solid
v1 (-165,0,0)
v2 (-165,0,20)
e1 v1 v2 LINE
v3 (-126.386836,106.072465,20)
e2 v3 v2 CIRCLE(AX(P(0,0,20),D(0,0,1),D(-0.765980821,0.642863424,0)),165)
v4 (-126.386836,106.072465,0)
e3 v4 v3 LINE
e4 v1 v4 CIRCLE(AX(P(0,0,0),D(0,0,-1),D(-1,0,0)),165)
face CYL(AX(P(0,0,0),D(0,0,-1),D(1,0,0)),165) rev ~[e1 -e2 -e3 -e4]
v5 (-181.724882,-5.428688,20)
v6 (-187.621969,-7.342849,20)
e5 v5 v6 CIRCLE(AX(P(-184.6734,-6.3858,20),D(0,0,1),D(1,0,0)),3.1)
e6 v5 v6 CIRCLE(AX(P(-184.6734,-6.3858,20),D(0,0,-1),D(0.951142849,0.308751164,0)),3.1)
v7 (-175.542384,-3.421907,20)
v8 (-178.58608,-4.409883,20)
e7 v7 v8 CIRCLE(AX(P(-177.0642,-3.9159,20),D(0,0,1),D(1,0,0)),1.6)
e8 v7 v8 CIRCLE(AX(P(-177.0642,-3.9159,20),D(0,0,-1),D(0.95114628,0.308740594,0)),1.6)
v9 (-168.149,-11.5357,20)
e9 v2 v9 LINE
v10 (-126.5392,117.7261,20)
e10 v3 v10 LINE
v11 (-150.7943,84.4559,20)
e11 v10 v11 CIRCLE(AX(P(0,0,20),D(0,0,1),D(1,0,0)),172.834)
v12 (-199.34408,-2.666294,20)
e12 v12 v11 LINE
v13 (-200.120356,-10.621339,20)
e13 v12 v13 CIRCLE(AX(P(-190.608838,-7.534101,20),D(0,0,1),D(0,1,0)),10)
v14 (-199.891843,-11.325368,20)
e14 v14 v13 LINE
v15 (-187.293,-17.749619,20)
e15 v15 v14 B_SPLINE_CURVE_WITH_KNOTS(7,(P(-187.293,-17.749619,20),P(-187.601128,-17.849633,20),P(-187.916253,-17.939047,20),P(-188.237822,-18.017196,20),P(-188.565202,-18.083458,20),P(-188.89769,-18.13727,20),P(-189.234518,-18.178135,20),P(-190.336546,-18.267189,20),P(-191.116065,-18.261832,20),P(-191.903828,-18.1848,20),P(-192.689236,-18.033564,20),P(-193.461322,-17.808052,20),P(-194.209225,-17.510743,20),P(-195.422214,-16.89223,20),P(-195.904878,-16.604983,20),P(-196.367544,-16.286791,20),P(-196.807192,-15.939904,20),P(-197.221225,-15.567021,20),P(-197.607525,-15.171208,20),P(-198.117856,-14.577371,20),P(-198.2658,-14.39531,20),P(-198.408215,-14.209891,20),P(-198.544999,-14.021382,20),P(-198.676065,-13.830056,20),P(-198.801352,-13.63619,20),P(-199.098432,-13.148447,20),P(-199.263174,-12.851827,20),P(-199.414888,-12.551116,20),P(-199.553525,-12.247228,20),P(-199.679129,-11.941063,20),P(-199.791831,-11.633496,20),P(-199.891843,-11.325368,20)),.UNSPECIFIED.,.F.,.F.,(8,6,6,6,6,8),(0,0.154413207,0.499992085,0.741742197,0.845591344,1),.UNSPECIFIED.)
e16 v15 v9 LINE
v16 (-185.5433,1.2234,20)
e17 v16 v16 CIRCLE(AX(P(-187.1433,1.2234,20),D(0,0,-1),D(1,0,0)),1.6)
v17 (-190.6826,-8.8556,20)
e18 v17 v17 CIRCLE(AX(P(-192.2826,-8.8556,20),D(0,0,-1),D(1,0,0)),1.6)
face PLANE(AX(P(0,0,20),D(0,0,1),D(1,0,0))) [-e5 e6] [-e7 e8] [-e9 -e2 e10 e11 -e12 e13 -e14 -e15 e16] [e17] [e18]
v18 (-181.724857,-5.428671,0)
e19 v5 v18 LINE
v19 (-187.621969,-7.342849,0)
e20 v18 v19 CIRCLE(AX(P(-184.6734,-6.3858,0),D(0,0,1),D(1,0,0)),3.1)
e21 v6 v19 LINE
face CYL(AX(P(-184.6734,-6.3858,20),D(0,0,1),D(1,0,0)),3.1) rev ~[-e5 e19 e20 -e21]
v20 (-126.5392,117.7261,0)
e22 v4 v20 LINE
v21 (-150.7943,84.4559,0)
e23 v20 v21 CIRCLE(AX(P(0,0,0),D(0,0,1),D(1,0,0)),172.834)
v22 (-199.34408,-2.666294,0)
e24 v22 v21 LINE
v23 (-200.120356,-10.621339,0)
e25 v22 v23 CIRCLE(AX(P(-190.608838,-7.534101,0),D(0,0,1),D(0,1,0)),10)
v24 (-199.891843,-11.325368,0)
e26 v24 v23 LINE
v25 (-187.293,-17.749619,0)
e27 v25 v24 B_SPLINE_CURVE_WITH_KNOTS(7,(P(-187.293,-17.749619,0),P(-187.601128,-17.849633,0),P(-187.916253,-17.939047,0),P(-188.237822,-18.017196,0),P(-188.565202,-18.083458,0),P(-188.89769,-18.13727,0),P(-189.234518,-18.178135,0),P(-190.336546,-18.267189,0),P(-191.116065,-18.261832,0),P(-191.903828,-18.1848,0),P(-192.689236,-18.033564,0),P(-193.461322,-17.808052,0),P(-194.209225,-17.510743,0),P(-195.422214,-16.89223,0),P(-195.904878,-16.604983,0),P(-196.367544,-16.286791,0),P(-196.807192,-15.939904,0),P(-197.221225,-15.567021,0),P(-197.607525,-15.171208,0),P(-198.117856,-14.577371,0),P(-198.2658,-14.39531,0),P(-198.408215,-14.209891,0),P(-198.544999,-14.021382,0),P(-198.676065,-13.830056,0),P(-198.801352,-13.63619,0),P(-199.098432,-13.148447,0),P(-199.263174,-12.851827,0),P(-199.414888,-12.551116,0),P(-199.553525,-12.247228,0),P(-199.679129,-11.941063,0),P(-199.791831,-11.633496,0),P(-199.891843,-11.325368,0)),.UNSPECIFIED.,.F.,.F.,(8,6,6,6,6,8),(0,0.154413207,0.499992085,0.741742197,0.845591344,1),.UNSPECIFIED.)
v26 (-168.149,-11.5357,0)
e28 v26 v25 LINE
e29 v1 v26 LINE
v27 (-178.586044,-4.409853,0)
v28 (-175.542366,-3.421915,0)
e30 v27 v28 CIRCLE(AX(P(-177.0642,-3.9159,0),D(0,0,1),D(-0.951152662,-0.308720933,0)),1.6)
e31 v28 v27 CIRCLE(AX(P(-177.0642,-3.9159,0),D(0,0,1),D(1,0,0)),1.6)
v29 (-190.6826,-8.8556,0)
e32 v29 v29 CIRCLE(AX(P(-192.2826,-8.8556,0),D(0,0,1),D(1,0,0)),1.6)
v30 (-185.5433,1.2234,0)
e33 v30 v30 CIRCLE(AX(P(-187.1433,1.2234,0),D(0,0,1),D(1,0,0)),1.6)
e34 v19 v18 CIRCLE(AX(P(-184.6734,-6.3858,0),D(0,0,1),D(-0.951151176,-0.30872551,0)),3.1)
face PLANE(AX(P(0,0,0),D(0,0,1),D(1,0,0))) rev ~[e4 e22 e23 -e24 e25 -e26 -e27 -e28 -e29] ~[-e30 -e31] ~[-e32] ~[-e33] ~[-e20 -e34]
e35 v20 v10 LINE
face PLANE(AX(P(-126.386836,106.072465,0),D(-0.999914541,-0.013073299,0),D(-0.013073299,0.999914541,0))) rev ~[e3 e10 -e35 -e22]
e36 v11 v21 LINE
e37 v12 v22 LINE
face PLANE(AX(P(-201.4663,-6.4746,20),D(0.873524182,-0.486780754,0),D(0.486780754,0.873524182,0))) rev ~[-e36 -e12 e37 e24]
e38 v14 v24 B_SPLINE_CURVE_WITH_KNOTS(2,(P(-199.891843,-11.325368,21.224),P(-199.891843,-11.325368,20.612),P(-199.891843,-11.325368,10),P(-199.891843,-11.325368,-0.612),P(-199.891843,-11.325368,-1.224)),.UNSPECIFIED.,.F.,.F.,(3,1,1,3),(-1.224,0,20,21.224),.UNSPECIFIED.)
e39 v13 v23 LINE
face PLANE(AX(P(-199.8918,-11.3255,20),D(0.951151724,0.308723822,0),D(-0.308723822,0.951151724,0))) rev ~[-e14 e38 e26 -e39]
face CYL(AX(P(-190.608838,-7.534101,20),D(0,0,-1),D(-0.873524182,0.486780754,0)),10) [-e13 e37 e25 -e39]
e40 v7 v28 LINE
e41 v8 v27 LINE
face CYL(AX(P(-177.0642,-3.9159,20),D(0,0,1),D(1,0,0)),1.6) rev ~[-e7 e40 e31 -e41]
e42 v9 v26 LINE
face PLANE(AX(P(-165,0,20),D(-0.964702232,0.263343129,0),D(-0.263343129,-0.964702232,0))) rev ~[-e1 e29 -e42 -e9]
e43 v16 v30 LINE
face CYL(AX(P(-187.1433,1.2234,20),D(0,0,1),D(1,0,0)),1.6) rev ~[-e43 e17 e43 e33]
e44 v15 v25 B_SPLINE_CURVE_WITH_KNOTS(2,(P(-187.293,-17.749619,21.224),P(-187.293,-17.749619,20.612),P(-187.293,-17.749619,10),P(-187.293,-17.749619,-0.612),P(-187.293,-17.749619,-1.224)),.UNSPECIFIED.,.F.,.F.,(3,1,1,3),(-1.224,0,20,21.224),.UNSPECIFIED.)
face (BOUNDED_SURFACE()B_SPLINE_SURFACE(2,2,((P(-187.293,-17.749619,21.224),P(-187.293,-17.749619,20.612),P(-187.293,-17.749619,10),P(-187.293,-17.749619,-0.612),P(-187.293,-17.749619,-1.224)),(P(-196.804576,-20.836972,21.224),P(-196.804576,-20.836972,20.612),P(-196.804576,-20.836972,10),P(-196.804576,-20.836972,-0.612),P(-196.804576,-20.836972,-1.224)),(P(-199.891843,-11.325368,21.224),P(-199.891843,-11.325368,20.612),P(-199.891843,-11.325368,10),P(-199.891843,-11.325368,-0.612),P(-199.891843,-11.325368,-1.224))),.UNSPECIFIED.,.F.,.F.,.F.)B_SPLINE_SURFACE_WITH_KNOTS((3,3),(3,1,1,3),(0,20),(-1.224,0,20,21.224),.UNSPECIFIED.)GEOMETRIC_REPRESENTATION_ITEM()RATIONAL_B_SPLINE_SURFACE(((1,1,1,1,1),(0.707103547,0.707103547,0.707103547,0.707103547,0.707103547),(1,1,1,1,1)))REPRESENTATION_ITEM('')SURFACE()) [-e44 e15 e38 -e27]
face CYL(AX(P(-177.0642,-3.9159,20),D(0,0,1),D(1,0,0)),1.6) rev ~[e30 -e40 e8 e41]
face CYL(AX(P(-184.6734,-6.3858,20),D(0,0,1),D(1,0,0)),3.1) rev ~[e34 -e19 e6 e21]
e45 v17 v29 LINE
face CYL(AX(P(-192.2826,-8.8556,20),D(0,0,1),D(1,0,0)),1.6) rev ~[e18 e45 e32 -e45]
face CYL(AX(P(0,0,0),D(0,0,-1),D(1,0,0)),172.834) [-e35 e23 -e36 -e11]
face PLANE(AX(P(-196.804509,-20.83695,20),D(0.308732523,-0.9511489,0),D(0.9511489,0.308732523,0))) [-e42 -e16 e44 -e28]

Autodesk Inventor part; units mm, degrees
ref_plane "YZ Plane" through (0, 0, 0) normal (1, 0, 0) x (0, 1, 0)
ref_plane "XZ Plane" through (0, 0, 0) normal (0, 1, 0) x (-1, 0, 0)
ref_plane "XY Plane" through (0, 0, 0) normal (0, 0, 1) x (1, 0, 0)
sketch "Эскиз1" plane through (0, 0, 0) normal (0, 0, 1) x (1, 0, 0)
  circle A0 centre (0, 0) radius 165
  circle A1 centre (0, 0) radius 172.834
  line L0 (-125, 0) -> (-126.5392, 117.7261)
  line L1 (-132.7592, 119.5177) -> (-197.8467, 76.6552)
  line L2 (-165, 0) -> (-153, 0) construction
  line L3 (-134.7038, 9.8338) -> (-172.765, -2.5204) projected
  line L4 (-165, 0) -> (-172.8154, -2.5368)
  point P0 (-172.834, 0)
  point P1 (-126.3868, 106.0725)
  point P2 (-123, 114.4334)
  point P3 (-172.8149, -2.5694)
  dimension "d0" = 330
  dimension "d1" = 345.668
  dimension "d2" = 40
extrude "Выдавливание1" add sketch "Эскиз1" along normal blind 20 contours L3 L4 A1 L0 A0 picked at (-133.2989, 101.385)
sketch "Эскиз2" plane through (0, 0, 0) normal (0, 0, -1) x (-1, 0, 0)
  arc A0 (172.8154, -2.5368) -> (126.5392, 117.7261) centre (0, 0) ccw projected
  arc A1 (165, 0) -> (126.3868, 106.0725) centre (0, 0) ccw projected
  circle A2 centre (0, 0) radius 168.917
  line L0 (172.8154, -2.5368) -> (165, 0) projected
  circle A3 centre (184.6734, -6.3858) radius 2.1
  line L1 (178.0154, -4.2246) -> (172.8154, -2.5368)
  line L2 (160.1198, 6.946) -> (198.8648, -5.6302)
  line L3 (182.8662, -5.7992) -> (187.0032, 6.946)
  line L4 (178.0154, -4.2246) -> (198.192, -10.7737)
  line L5 (184.6734, -6.3858) -> (189.5243, -7.9603)
  line L6 (189.5243, -7.9603) -> (192.7095, 1.8528)
  point P0 (184.4408, -0.9483)
  point P1 (172.8109, 2.8266)
  point P2 (176.018, -3.5763)
  point P3 (182.676, -5.7374)
  point P4 (183.1424, -4.9484)
  point P5 (164.9119, 5.3905)
  point P6 (186.6708, -7.0341)
  point P7 (191.0988, -3.1094)
  dimension "d8" = 337.834
  dimension "d11" = 4.2
  dimension "d18" = 5.1
extrude "Выдавливание2" add sketch "Эскиз2" against normal up to surface (20 mm away) contours L0 A2 L2 A0 | A0 L2 L3 A3 L4 L1 | L0 A1 L2 A2 | L2 L6 L4 A3 L3 picked at (166.282, 2.7097)
sketch "Эскиз3" plane through (0, 0, 20) normal (0, 0, 1) x (1, 0, 0)
  arc A0 (-126.3868, 106.0725) -> (-165, 0) centre (0, 0) ccw projected
  line L0 (-126.3868, 106.0725) -> (-126.5392, 117.7261) projected
  arc A1 (-126.5392, 117.7261) -> (-172.8109, 2.8266) centre (0, 0) ccw projected
  line L1 (-191.0988, -3.1094) -> (-172.8109, 2.8266) projected
  line L2 (-189.5243, -7.9603) -> (-191.0988, -3.1094) projected
  line L3 (-186.6708, -7.0341) -> (-189.5243, -7.9603) projected
  arc A2 (-182.676, -5.7374) -> (-186.6708, -7.0341) centre (-184.6734, -6.3858) ccw projected
  line L4 (-165, 0) -> (-182.676, -5.7374) projected
  circle A3 centre (-184.6734, -6.3858) radius 3.1
  arc A4 (-126.5392, 117.7261) -> (-172.8109, 2.8266) centre (0, 0) ccw projected
  line L5 (-184.6734, -6.3858) -> (-194.1849, -9.4731)
  line L6 (-194.1849, -9.4731) -> (-195.7594, -4.6222)
  line L7 (-195.7594, -4.6222) -> (-191.0988, -3.1094)
  circle A5 centre (-184.6734, -6.3858) radius 11
  circle A6 centre (-184.6734, -6.3858) radius 9.5
  circle A7 centre (-184.6734, -6.3858) radius 6.5
  line L8 (-190.8559, -8.3925) -> (-193.7093, -9.3187)
  circle A8 centre (-192.2826, -8.8556) radius 1.6
  circle A9 centre (-182.2036, -13.995) radius 1.6
  circle A10 centre (-177.0642, -3.9159) radius 1.6
  circle A11 centre (-187.1433, 1.2234) radius 1.6
  line L9 (-192.2826, -8.8556) -> (-199.8918, -11.3255)
  line L10 (-199.8918, -11.3255) -> (-201.4663, -6.4746)
  line L11 (-201.4663, -6.4746) -> (-191.0988, -3.1094)
  line L12 (-201.4663, -6.4746) -> (-195.8644, -23.7333)
  line L13 (-172.8109, 2.8266) -> (-166.0857, -17.8924)
  line L14 (-184.6734, -6.3858) -> (-181.5861, -15.8973)
  line L15 (-165, 0) -> (-182.676, -5.7374) projected
  line L16 (-209.847, -25.0704) -> (-154.8396, -7.2156)
  line L17 (-201.4663, -6.4746) -> (-150.7943, 84.4559)
  line L18 (-165, 0) -> (-168.149, -11.5357)
  point P0 (-182.1957, -12.395)
  point P1 (-183.1496, -12.7046)
  point P2 (-195.5181, -4.5439)
  point P3 (-195.5997, -5.1144)
  point P4 (-193.5037, -9.8895)
  point P5 (-175.4687, -4.0356)
  point P6 (-178.5861, -4.4099)
  point P7 (-181.7249, -5.4287)
  point P8 (-187.622, -7.3428)
  point P9 (-150.9747, 84.1323)
  point P10 (-193.8045, -9.3496)
  point P11 (-196.8045, -20.837)
  point P12 (-168.149, -11.5357)
  point P13 (-171.2364, -2.0242)
  point P14 (-175.5424, -3.4219)
  point P15 (-181.1697, -15.216)
  point P16 (-182.3233, -15.5905)
  dimension "d22" = 19
  dimension "d23" = 13
  dimension "d19" = 6.2
  dimension "d20" = 10
  dimension "d21" = 22
  dimension "d24" = 3.2
  dimension "d27" = 360
  dimension "d29" = 8
  dimension "d30" = 10
  dimension "d33" = 10
extrude "Выдавливание3" add sketch "Эскиз3" against normal up to surface (20 mm away) contours A1 L1 A5 L7 L11 L17 | L11 L6 A5 L9 L10 | L1 A6 A11 L7 A5 | L13 L16 A5 L4 | L4 L18 L13 | L9 A5 L16 L12 | L7 A5 L6 | L1 A7 A11 A6 | A5 L16 L14 A9 A6 A10 L4 | L7 A6 A8 L5 L6 A5 | L9 L5 A8 A6 A9 L14 L16 A5 | A5 L6 L9 | L1 A7 A11 | A6 A11 A7 L1 L7 | L7 L2 A7 A8 A6 | L2 L5 A8 A7 | A10 A7 A9 L14 A3 L4 | A6 A9 A7 A10 | L14 A6 A9 | A9 A6 L14 | A8 A7 A9 A6 | L3 A3 L14 A9 A7 A8 L5 | A9 A7 L14 A6 | A6 L14 A7 A9 | A9 L14 A7 | L14 A9 A7
sketch "Эскиз4" plane through (0, 0, 20) normal (0, 0, 1) x (1, 0, 0)
  arc A0 (-187.622, -7.3428) -> (-181.7249, -5.4287) centre (-184.6734, -6.3858) ccw projected
  arc A1 (-178.5861, -4.4099) -> (-175.5424, -3.4219) centre (-177.0642, -3.9159) ccw projected
  circle A2 centre (-184.6734, -6.3858) radius 3.1
  circle A3 centre (-177.0642, -3.9159) radius 1.6
  point P0 (0, 0)
  point P1 (-175.5424, -3.4219)
  point P2 (-178.5861, -4.4099)
  point P3 (-181.7249, -5.4287)
  point P4 (-187.622, -7.3428)
extrude "Выдавливание4" cut sketch "Эскиз4" against normal through all
fillet "Сопряжение2" radius 10 2 edges at (-201.4663, -6.4746, 10) (-196.8045, -20.837, 10)
sketch "Эскиз5" plane through (0, 0, 20) normal (0, 0, 1) x (1, 0, 0)
  circle A0 centre (-177.0642, -3.9159) radius 1.6 projected
  circle A1 centre (-192.2826, -8.8556) radius 1.6 projected
  circle A2 centre (-187.1433, 1.2234) radius 1.6 projected
  circle A3 centre (-184.6734, -6.3858) radius 3.1 projected
  point P0 (0, 0)
properties part number "направление"
